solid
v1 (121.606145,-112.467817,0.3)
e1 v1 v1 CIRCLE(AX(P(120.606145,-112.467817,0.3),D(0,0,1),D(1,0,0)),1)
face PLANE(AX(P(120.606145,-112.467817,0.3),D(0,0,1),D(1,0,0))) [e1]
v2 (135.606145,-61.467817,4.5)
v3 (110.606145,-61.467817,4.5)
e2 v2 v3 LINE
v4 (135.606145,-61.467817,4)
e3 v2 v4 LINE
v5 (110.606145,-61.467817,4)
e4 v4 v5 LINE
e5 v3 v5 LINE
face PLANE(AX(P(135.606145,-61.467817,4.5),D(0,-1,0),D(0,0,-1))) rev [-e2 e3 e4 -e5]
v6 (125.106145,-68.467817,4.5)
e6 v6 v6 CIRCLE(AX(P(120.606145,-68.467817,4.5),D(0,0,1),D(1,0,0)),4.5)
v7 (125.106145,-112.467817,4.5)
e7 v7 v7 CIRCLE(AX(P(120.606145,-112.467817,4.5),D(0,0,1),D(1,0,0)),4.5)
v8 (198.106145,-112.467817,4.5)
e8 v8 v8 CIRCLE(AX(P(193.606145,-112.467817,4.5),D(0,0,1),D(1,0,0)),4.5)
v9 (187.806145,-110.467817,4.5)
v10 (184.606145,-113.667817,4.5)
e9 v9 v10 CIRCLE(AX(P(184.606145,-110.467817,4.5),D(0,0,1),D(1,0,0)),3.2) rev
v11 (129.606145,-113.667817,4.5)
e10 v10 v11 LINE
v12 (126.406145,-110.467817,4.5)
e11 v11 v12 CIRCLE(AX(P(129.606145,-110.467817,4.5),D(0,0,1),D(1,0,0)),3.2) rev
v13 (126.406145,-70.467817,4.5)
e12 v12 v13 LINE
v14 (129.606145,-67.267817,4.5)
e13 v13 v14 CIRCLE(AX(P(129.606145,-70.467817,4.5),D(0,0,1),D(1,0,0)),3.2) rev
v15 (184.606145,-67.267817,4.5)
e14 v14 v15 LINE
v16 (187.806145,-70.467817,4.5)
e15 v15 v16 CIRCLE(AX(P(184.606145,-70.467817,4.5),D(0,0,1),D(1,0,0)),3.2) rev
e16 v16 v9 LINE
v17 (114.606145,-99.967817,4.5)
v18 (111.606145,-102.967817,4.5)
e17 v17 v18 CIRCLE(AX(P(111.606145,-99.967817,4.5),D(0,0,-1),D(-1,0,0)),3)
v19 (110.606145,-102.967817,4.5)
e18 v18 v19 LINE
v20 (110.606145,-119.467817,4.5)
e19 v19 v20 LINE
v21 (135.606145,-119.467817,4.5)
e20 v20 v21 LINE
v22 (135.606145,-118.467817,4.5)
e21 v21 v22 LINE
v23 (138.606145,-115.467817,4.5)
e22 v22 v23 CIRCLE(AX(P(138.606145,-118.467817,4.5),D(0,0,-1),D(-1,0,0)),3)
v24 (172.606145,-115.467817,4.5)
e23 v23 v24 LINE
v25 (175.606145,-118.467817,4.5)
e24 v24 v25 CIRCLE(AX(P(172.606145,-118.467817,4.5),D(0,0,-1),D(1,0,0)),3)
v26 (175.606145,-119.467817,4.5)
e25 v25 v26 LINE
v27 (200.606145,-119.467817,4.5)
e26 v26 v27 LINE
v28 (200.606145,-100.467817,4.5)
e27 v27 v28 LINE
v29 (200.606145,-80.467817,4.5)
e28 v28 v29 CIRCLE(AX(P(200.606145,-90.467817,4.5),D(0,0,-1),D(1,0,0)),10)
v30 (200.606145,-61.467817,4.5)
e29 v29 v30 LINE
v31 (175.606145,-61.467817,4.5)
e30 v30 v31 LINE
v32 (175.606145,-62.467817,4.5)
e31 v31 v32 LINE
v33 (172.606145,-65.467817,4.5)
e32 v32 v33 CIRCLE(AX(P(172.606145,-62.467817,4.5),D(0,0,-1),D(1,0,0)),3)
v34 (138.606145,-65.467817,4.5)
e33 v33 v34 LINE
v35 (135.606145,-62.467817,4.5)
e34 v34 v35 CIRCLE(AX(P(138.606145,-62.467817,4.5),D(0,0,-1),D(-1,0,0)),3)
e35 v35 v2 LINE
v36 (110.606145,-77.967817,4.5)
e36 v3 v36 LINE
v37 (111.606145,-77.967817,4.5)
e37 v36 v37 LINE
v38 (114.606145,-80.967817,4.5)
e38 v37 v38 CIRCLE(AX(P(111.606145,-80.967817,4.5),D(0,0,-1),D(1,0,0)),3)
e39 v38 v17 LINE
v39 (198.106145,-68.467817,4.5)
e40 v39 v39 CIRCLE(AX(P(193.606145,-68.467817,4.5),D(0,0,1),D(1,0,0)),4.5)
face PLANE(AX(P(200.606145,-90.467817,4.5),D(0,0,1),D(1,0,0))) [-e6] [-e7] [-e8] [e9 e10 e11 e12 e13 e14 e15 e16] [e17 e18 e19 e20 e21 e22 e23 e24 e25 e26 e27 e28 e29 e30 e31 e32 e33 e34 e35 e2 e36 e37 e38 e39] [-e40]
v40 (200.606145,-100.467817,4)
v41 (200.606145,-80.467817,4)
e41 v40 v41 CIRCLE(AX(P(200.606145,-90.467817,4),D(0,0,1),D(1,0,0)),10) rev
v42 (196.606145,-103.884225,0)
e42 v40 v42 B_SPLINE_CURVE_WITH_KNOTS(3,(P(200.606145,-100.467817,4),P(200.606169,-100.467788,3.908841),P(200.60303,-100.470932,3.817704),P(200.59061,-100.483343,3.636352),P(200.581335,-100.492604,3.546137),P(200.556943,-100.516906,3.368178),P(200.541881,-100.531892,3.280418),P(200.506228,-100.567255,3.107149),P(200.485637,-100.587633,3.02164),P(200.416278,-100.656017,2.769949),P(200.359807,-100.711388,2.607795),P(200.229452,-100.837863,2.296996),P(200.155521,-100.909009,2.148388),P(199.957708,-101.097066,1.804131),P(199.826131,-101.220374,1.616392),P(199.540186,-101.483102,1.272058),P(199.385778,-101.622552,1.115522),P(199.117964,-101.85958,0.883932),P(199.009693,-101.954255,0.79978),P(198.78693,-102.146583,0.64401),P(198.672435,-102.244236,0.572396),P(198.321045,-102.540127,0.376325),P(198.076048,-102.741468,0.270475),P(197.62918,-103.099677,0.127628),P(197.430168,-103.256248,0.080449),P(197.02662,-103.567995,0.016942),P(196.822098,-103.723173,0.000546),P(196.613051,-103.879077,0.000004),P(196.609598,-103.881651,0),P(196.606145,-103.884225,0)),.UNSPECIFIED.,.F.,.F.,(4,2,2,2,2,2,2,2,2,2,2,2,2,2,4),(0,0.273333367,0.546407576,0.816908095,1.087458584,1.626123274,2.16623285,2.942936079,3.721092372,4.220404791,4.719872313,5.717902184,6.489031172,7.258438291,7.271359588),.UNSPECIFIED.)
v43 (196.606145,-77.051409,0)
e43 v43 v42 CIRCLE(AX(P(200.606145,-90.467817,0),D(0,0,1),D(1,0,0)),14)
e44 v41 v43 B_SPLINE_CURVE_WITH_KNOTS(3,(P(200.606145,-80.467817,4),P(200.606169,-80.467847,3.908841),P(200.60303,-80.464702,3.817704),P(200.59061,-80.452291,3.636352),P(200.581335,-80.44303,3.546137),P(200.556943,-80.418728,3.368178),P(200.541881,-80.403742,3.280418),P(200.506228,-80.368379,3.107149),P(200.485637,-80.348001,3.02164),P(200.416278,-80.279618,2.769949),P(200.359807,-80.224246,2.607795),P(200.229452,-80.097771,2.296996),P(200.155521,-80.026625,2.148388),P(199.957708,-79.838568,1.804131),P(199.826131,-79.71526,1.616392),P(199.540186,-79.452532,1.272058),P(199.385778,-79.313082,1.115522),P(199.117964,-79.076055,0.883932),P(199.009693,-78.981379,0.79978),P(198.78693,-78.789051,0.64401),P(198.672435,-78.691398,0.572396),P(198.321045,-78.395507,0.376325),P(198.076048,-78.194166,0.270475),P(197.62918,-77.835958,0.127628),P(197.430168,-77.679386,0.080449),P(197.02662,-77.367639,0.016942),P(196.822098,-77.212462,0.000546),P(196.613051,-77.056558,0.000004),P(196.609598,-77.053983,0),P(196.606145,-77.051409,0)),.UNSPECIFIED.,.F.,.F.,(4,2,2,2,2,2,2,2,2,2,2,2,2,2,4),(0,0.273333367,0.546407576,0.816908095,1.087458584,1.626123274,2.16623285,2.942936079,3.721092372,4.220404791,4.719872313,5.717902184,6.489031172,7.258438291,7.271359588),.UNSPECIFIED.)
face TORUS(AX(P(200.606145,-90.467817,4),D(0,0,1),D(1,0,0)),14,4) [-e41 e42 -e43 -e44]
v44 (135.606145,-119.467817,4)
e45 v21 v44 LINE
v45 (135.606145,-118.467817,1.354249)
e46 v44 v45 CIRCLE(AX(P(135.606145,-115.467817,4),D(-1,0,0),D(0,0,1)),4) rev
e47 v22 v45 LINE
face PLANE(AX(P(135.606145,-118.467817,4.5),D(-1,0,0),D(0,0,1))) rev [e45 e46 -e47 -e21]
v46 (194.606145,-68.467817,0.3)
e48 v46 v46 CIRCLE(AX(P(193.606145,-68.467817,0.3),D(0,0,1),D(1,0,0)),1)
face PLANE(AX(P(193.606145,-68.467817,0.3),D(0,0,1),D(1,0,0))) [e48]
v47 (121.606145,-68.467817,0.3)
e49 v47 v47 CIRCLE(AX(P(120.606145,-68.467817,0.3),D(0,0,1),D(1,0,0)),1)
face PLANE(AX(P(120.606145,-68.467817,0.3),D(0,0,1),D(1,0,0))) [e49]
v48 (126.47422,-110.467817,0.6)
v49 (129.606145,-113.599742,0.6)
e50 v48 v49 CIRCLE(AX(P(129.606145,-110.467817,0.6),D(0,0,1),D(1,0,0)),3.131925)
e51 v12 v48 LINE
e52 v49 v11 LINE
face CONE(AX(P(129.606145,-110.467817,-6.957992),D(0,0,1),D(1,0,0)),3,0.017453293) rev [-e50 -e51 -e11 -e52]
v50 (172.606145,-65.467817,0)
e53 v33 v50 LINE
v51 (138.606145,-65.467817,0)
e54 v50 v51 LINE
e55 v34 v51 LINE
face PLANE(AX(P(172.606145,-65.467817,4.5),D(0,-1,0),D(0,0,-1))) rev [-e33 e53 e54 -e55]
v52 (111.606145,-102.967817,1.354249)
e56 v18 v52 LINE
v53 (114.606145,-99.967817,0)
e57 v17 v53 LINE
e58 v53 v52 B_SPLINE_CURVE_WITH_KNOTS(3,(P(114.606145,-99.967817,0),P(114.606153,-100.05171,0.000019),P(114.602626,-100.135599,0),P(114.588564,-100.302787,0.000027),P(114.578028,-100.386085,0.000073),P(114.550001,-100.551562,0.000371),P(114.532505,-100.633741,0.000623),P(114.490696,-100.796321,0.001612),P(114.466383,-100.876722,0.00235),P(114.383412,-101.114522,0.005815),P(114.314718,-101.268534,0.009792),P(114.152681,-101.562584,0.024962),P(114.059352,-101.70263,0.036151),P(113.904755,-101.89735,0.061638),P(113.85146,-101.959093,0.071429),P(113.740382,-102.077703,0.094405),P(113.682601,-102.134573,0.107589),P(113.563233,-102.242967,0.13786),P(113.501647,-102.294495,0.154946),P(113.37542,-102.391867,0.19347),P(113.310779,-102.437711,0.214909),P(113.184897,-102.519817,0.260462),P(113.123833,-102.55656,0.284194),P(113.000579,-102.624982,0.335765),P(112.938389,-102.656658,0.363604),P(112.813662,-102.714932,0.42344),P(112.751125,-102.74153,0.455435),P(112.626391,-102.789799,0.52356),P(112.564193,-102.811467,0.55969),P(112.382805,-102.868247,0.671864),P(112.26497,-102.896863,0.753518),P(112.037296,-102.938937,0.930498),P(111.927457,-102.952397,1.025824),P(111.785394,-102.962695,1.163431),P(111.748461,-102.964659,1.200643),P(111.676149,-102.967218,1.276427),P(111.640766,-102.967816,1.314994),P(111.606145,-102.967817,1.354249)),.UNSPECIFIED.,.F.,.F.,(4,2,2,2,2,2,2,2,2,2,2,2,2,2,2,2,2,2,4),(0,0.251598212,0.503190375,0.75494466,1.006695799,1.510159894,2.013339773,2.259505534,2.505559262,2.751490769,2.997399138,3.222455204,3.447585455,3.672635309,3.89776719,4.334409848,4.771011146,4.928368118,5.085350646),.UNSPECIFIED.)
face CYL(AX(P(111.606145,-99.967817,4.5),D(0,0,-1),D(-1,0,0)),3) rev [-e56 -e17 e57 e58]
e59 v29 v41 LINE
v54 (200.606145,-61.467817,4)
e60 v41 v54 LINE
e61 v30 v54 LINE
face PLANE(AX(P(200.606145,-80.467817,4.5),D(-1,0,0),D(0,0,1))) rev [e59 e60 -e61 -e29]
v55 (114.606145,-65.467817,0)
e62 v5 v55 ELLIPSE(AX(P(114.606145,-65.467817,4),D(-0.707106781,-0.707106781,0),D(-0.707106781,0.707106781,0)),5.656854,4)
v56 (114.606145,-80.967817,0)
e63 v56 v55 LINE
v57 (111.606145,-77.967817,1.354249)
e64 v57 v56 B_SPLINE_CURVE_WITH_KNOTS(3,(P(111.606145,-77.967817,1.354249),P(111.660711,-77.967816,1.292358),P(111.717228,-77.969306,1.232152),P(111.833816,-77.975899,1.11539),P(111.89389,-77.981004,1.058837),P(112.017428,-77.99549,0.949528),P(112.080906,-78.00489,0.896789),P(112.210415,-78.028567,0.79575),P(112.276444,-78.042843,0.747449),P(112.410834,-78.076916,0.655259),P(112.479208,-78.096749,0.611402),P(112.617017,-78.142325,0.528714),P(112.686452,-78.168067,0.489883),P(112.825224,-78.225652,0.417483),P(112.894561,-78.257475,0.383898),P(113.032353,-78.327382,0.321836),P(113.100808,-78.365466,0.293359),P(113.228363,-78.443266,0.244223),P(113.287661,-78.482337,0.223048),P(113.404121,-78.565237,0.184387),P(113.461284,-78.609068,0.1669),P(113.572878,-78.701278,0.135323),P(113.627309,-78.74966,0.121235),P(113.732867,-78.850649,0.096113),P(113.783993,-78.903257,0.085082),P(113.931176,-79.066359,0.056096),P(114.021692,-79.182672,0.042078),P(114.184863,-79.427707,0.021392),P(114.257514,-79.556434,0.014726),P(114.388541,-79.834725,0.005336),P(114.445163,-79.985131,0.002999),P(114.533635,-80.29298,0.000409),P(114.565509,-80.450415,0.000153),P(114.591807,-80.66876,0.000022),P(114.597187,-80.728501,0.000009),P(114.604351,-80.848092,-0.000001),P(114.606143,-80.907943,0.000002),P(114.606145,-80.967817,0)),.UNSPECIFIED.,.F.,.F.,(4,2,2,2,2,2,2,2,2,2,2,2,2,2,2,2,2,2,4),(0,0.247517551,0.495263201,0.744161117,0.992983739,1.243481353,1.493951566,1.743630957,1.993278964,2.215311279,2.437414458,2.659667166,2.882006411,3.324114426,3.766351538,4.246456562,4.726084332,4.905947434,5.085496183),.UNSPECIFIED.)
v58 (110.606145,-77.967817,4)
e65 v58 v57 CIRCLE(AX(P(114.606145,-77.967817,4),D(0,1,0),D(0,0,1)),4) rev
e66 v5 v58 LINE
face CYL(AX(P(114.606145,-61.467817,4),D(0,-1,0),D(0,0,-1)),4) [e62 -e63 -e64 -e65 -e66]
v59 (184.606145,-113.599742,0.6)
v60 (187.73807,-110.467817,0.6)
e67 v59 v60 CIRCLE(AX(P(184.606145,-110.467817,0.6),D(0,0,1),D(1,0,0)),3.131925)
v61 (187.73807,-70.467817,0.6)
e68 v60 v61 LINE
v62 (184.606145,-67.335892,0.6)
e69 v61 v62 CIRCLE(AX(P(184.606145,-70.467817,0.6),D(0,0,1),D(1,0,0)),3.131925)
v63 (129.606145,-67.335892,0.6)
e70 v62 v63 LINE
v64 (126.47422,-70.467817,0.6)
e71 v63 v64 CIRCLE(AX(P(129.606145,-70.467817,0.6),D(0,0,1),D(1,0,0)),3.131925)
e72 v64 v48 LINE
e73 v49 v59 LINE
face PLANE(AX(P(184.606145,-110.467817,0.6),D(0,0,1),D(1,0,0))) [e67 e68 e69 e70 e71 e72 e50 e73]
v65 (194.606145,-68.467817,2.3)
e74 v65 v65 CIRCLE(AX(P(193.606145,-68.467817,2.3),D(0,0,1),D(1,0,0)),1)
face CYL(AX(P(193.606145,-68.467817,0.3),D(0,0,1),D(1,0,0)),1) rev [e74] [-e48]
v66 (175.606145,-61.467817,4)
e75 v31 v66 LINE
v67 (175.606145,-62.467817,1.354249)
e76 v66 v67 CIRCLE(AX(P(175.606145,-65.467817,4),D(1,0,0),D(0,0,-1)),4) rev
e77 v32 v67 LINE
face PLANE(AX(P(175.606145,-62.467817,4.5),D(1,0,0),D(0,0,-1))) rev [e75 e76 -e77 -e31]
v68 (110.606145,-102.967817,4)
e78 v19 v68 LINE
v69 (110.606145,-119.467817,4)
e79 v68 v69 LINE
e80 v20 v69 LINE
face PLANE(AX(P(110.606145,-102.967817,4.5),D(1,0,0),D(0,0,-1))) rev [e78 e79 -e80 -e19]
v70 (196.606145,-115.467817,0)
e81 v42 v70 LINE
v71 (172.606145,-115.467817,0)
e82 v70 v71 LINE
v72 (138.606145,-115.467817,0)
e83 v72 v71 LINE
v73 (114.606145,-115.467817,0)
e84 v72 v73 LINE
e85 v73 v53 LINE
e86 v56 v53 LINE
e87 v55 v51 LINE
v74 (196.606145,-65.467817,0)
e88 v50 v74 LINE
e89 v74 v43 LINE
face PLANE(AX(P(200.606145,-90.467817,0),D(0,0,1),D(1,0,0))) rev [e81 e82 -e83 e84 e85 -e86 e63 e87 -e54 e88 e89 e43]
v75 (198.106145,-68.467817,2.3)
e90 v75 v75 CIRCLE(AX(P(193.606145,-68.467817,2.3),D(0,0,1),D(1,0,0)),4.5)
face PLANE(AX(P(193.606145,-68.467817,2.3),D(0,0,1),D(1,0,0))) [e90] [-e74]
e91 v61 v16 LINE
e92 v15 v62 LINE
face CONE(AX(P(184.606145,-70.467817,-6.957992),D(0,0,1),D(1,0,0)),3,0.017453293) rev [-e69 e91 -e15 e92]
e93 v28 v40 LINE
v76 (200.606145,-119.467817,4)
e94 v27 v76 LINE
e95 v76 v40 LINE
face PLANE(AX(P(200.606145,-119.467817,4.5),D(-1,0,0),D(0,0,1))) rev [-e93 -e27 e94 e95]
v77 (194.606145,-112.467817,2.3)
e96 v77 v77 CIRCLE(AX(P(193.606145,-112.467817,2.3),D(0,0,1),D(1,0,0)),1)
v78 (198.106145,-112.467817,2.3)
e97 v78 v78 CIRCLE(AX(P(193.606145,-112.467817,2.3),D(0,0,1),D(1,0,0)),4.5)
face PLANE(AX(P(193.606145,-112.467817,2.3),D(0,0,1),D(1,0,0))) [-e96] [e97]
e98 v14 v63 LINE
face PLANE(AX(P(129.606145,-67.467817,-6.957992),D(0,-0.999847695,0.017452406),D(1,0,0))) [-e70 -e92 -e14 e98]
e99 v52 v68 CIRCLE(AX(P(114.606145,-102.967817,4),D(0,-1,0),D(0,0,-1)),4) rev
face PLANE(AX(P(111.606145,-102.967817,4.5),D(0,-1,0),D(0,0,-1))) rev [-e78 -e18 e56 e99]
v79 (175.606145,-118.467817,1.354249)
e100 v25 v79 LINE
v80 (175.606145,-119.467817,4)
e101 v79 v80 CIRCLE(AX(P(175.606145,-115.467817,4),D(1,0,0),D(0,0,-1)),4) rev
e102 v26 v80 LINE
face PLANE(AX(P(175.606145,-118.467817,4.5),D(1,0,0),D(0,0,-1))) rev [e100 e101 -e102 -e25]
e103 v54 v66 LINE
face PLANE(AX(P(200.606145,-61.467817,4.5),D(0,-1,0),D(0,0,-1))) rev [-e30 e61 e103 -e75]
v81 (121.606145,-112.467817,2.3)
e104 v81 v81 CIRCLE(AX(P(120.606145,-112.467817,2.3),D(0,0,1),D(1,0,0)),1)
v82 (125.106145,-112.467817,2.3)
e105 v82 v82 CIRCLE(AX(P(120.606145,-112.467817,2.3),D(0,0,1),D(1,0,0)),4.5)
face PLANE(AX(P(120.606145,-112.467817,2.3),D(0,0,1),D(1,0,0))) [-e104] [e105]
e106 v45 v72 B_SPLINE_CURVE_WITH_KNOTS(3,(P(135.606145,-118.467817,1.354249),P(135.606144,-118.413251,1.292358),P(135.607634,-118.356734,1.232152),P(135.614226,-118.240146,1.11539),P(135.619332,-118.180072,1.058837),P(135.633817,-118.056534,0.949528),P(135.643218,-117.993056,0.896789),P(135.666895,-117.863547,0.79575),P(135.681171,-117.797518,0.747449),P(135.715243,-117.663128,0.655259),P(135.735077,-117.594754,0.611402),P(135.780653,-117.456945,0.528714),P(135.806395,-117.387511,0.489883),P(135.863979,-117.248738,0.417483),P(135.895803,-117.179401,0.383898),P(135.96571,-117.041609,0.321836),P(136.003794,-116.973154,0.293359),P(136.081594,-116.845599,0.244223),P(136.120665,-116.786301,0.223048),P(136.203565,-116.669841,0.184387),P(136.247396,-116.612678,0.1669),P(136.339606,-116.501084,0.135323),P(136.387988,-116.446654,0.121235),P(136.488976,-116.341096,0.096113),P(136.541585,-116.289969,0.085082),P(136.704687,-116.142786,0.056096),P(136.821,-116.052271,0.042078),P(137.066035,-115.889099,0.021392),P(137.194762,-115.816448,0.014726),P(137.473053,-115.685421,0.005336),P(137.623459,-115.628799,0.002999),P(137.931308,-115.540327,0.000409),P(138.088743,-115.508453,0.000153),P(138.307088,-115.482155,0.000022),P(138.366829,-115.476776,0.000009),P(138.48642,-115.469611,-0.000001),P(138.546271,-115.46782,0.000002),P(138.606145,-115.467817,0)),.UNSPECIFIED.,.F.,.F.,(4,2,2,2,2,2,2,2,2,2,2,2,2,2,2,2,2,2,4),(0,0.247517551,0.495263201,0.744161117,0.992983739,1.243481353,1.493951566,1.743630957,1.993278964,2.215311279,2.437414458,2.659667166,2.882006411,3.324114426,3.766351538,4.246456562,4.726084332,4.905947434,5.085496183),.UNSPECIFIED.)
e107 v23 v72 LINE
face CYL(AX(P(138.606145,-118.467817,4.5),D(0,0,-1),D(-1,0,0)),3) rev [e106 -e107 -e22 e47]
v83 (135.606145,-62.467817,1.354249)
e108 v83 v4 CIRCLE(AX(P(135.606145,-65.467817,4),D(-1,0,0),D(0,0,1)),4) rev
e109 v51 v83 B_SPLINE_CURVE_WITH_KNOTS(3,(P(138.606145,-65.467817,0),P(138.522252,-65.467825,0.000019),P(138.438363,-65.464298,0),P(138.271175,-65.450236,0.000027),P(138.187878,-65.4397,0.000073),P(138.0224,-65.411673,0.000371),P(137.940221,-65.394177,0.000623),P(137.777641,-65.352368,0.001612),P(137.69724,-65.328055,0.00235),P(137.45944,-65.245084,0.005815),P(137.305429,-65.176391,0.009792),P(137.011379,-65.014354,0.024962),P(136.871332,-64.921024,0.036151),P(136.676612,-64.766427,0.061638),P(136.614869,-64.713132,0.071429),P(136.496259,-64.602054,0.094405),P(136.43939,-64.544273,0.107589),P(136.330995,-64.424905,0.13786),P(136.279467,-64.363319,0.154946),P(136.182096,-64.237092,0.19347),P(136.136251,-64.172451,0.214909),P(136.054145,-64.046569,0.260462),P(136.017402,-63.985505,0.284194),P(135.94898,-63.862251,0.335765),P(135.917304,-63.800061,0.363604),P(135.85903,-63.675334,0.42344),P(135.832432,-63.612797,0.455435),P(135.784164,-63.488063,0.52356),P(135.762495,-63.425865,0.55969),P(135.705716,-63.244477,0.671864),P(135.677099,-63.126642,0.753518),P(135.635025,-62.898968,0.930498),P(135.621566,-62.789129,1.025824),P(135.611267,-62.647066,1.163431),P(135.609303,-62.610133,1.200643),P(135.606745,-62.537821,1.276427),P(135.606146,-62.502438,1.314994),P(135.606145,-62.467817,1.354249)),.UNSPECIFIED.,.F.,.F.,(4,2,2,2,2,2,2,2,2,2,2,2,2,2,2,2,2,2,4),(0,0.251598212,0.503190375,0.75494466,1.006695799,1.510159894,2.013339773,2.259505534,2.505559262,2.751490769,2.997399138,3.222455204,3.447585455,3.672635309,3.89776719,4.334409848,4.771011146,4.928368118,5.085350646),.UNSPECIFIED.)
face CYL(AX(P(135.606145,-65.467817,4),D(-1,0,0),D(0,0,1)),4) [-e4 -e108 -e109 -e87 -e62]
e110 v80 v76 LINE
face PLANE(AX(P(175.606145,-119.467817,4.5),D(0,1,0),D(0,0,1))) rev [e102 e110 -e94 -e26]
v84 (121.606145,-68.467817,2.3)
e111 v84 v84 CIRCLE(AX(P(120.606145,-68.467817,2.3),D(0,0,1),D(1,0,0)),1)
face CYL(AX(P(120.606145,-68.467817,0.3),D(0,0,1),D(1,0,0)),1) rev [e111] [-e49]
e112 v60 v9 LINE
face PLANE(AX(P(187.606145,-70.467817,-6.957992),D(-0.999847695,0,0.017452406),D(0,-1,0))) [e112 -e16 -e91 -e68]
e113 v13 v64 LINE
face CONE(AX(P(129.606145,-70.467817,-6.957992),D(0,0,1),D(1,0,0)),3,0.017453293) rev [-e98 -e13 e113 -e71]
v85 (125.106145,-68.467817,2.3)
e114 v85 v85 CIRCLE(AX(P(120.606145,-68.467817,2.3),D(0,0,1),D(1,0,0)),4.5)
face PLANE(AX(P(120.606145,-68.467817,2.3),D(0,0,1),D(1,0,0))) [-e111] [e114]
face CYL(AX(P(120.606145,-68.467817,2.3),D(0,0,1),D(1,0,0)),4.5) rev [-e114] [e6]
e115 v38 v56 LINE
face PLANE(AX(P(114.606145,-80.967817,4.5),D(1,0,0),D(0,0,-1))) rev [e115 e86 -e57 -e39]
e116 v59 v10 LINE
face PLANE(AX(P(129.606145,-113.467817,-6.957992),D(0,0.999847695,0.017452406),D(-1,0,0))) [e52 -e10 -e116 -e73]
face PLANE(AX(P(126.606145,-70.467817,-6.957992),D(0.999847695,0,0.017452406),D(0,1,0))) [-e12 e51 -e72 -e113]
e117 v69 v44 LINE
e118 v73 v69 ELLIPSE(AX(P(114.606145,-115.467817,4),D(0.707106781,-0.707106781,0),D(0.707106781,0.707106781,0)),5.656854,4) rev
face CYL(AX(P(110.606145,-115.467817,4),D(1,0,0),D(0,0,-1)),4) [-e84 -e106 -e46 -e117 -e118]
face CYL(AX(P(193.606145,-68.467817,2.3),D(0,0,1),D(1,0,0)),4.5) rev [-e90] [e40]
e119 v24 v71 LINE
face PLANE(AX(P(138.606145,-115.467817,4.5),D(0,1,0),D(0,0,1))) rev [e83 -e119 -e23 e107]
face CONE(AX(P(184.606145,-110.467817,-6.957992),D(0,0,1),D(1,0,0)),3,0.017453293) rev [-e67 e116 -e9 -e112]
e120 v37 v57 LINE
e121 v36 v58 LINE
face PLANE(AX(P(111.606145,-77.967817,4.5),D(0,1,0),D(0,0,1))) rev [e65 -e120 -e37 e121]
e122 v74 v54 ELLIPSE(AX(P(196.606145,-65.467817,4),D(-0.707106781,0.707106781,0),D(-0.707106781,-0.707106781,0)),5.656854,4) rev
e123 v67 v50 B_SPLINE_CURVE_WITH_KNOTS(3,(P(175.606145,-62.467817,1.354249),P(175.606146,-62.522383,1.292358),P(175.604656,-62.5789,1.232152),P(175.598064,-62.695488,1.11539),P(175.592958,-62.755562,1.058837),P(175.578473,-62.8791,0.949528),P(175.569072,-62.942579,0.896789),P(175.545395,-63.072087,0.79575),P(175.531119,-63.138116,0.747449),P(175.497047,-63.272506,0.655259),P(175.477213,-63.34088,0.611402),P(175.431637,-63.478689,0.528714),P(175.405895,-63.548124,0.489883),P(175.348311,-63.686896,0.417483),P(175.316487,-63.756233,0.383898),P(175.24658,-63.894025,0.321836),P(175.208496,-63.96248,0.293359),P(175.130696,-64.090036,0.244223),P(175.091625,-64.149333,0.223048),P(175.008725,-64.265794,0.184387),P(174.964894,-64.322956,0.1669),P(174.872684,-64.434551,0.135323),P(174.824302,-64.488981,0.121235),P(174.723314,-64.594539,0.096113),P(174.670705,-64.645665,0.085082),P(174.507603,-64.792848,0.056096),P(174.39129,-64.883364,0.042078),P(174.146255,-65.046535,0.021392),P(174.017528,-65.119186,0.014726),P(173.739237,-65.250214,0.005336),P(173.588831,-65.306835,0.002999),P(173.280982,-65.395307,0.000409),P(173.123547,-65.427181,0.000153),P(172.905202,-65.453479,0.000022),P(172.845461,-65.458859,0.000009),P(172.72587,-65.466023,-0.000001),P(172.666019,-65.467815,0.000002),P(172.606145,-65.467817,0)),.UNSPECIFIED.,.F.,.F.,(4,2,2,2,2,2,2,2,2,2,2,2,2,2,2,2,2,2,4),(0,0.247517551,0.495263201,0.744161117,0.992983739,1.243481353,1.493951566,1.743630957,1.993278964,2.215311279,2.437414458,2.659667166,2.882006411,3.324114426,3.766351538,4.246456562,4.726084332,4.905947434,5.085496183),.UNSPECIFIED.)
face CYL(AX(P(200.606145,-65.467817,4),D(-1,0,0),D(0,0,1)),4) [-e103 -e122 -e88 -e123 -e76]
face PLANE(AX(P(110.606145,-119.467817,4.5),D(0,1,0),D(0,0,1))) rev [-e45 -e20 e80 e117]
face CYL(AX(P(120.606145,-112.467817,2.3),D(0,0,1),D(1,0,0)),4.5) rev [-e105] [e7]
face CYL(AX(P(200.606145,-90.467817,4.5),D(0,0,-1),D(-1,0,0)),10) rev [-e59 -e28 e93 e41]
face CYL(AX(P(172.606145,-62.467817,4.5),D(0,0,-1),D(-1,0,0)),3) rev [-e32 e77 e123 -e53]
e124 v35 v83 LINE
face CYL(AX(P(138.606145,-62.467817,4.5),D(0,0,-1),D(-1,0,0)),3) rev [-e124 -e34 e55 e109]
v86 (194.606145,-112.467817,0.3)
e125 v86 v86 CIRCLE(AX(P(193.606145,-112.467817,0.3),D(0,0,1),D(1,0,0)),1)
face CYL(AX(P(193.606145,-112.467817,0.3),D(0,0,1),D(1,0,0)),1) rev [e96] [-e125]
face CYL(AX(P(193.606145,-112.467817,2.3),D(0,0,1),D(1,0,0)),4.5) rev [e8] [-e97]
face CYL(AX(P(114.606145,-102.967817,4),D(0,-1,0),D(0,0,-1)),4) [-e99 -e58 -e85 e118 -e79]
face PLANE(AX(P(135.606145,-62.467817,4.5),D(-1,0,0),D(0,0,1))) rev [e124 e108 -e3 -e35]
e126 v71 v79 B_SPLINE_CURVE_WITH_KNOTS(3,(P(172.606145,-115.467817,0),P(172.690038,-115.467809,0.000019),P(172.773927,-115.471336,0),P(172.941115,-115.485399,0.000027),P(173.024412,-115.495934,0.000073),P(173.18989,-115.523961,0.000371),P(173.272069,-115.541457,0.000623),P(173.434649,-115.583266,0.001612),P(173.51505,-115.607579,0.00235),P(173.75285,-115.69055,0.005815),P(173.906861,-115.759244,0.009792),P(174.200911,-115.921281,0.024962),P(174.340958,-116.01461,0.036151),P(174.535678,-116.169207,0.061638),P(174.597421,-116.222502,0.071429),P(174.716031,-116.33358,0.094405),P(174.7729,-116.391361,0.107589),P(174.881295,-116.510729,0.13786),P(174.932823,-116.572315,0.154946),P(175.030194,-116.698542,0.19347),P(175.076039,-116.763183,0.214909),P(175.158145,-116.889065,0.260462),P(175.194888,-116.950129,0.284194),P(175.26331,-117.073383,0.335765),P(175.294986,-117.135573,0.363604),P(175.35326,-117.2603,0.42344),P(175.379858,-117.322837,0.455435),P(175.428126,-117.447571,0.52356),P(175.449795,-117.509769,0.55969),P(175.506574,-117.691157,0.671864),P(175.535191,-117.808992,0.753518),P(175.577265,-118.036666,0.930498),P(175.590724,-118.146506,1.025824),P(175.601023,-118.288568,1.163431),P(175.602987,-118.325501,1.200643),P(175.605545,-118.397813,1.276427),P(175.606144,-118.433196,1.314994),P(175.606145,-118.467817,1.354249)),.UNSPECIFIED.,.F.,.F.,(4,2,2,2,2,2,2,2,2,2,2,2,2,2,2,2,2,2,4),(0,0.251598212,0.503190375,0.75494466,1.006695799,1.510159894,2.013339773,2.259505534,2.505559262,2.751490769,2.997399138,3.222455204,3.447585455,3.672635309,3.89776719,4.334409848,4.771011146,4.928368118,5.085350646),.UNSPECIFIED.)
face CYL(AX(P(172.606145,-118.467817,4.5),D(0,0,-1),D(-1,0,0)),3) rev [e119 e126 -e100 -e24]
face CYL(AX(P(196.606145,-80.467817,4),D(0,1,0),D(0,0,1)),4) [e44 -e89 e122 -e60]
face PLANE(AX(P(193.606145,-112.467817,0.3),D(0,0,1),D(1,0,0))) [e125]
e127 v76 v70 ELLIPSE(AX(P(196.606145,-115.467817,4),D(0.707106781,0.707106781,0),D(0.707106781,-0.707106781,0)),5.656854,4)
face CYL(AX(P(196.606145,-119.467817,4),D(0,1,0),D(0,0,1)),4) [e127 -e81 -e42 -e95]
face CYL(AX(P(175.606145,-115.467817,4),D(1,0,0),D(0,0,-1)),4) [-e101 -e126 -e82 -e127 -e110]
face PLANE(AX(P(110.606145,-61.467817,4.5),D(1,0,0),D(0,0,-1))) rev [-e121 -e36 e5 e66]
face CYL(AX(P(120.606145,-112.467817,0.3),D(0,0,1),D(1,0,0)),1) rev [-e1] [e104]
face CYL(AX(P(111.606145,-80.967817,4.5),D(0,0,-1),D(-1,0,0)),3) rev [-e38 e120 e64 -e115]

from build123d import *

# Parameters (mm, degrees)
Y_KSEKLIK_EKSTR_ZYON1_DEPTH = 4.5
KES_EKSTR_ZYON2_DEPTH       = 3.9
IZIM7_R                     = 4.5
KES_EKSTR_ZYON3_DEPTH       = 2.2
IZIM9_R                     = 1
KES_EKSTR_ZYON4_DEPTH       = 2
RADYUS4_R                   = 4
PAH1_SIZE                   = 0.2
PAH1_SIZE_2                 = 11.457992326


# Some blends are built 0.0001 mm under size
with BuildPart() as part:
    # Çizim4 → Yükseklik-Ekstrüzyon1 (new body)
    with BuildSketch(Plane.XY):
        with BuildLine():
            Line((200.606144994, -119.46781712), (200.606144994, -100.46781712))
            ThreePointArc((200.606144994, -100.46781712), (190.606144994, -90.46781712), (200.606144994, -80.46781712))
            Line((200.606144994, -80.46781712), (200.606144994, -61.46781712))
            Line((200.606144994, -61.46781712), (175.606144994, -61.46781712))
            Line((175.606144994, -61.46781712), (175.606144994, -62.46781712))
            ThreePointArc((175.606144994, -62.46781712), (174.727465338, -64.589137464), (172.606144994, -65.46781712))
            Line((172.606144994, -65.46781712), (138.606144994, -65.46781712))
            ThreePointArc((138.606144994, -65.46781712), (136.484824651, -64.589137464), (135.606144994, -62.46781712))
            Line((135.606144994, -62.46781712), (135.606144994, -61.46781712))
            Line((135.606144994, -61.46781712), (110.606144994, -61.46781712))
            Line((110.606144994, -61.46781712), (110.606144994, -77.96781712))
            Line((110.606144994, -77.96781712), (111.606144994, -77.96781712))
            ThreePointArc((111.606144994, -77.96781712), (113.727465338, -78.846496777), (114.606144994, -80.96781712))
            Line((114.606144994, -80.96781712), (114.606144994, -99.96781712))
            ThreePointArc((114.606144994, -99.96781712), (113.727465338, -102.089137464), (111.606144994, -102.96781712))
            Line((111.606144994, -102.96781712), (110.606144994, -102.96781712))
            Line((110.606144994, -102.96781712), (110.606144994, -119.46781712))
            Line((110.606144994, -119.46781712), (135.606144994, -119.46781712))
            Line((135.606144994, -119.46781712), (135.606144994, -118.46781712))
            ThreePointArc((135.606144994, -118.46781712), (136.484824651, -116.346496777), (138.606144994, -115.46781712))
            Line((138.606144994, -115.46781712), (172.606144994, -115.46781712))
            ThreePointArc((172.606144994, -115.46781712), (174.727465338, -116.346496777), (175.606144994, -118.46781712))
            Line((175.606144994, -118.46781712), (175.606144994, -119.46781712))
            Line((175.606144994, -119.46781712), (200.606144994, -119.46781712))
        make_face()
    extrude(amount=Y_KSEKLIK_EKSTR_ZYON1_DEPTH)

    # Çizim6 → Kes-Ekstrüzyon2 (cut)
    with BuildSketch(Plane.XY.offset(4.5)):
        with BuildLine():
            Line((129.606144994, -67.46781712), (184.606144994, -67.46781712))
            ThreePointArc((184.606144994, -67.46781712), (186.727465338, -68.346496777), (187.606144994, -70.46781712))
            Line((187.606144994, -70.46781712), (187.606144994, -110.46781712))
            ThreePointArc((187.606144994, -110.46781712), (186.727465338, -112.589137464), (184.606144994, -113.46781712))
            Line((184.606144994, -113.46781712), (129.606144994, -113.46781712))
            ThreePointArc((129.606144994, -113.46781712), (127.484824651, -112.589137464), (126.606144994, -110.46781712))
            Line((126.606144994, -110.46781712), (126.606144994, -70.46781712))
            ThreePointArc((126.606144994, -70.46781712), (127.484824651, -68.346496777), (129.606144994, -67.46781712))
        make_face()
    extrude(amount=-KES_EKSTR_ZYON2_DEPTH, mode=Mode.SUBTRACT)

    # Çizim7 → Kes-Ekstrüzyon3 (cut)
    with BuildSketch(Plane.XY.offset(4.5)):
        with Locations((193.606144994, -68.46781712)):
            Circle(IZIM7_R)
        with Locations((193.606144994, -112.46781712)):
            Circle(IZIM7_R)
        with Locations((120.606144994, -68.46781712)):
            Circle(IZIM7_R)
        with Locations((120.606144994, -112.46781712)):
            Circle(IZIM7_R)
    extrude(amount=-KES_EKSTR_ZYON3_DEPTH, mode=Mode.SUBTRACT)

    # Çizim9 → Kes-Ekstrüzyon4 (cut)
    with BuildSketch(Plane.XY.offset(2.3)):
        with Locations((193.606144994, -68.46781712)):
            Circle(IZIM9_R)
        with Locations((193.606144994, -112.46781712)):
            Circle(IZIM9_R)
        with Locations((120.606144994, -68.46781712)):
            Circle(IZIM9_R)
        with Locations((120.606144994, -112.46781712)):
            Circle(IZIM9_R)
    extrude(amount=-KES_EKSTR_ZYON4_DEPTH, mode=Mode.SUBTRACT)

    # Radyus4
    radyus4_edges = [part.edges().sort_by_distance(p)[0] for p in [
        (123.106144994, -61.46781712, 0),
        (110.606144994, -111.21781712, 0),
        (123.106144994, -119.46781712, 0),
        (188.106144994, -119.46781712, 0),
        (188.106144994, -61.46781712, 0),
        (110.606144994, -69.71781712, 0),
        (200.606144994, -70.96781712, 0),
        (190.606144994, -90.46781712, 0),
        (200.606144994, -109.96781712, 0),
    ]]
    fillet(radyus4_edges, radius=RADYUS4_R - 0.0001)  # a hair under: the kernel refuses the full size

    # Pah1
    # the kernel refuses this chamfer: 11.457992326, 0.2 mm, written as the material it takes off along each edge
    with BuildSketch(Plane(origin=(184.606144994, -70.46781712, 4.5), x_dir=(0, 1, 0), z_dir=(-1, 0, 0))) as pah1_piece_1_section:
        Polygon((3 + PAH1_SIZE, 0), (3, PAH1_SIZE_2), (3, 0), align=None)
    pah1_piece_1 = revolve(axis=Axis((184.606144994, -70.46781712, 4.5), (0, 0, -1)), revolution_arc=90, mode=Mode.PRIVATE)
    pah1_piece_1 = split(pah1_piece_1, bisect_by=Plane(origin=(184.990398639, -67.399868147, 0.6), z_dir=(0, 0, 1)), keep=Keep.TOP, mode=Mode.PRIVATE)
    add(pah1_piece_1, mode=Mode.SUBTRACT)
    with BuildSketch(Plane(origin=(187.606144994, -70.46781712, 4.5), x_dir=(0.41331439412646753, 0, 0.9105883875867686), z_dir=(0, -1, 0))) as pah1_piece_2_section:
        Polygon((PAH1_SIZE * 0.413314394126, -PAH1_SIZE * 0.910588387587), (-PAH1_SIZE_2 * 0.910588387599, -PAH1_SIZE_2 * 0.413314394132), (0, 0), align=None)
    pah1_piece_2 = extrude(amount=40, mode=Mode.PRIVATE)
    pah1_piece_2 = split(pah1_piece_2, bisect_by=Plane(origin=(187.689115858, -74.555184991, 0.6), z_dir=(0, 0, 1)), keep=Keep.TOP, mode=Mode.PRIVATE)
    add(pah1_piece_2, mode=Mode.SUBTRACT)
    with BuildSketch(Plane(origin=(184.606144994, -110.46781712, 4.5), x_dir=(1, 0, 0), z_dir=(0, 1, 0))) as pah1_piece_3_section:
        Polygon((3 + PAH1_SIZE, 0), (3, PAH1_SIZE_2), (3, 0), align=None)
    pah1_piece_3 = revolve(axis=Axis((184.606144994, -110.46781712, 4.5), (0, 0, -1)), revolution_arc=90, mode=Mode.PRIVATE)
    pah1_piece_3 = split(pah1_piece_3, bisect_by=Plane(origin=(187.674093967, -110.852070765, 0.6), z_dir=(0, 0, 1)), keep=Keep.TOP, mode=Mode.PRIVATE)
    add(pah1_piece_3, mode=Mode.SUBTRACT)
    with BuildSketch(Plane(origin=(184.606144994, -113.46781712, 4.5), x_dir=(0, -0.41331439412651433, 0.9105883875867473), z_dir=(-1, 0, 0))) as pah1_piece_4_section:
        Polygon((PAH1_SIZE * 0.413314394127, -PAH1_SIZE * 0.910588387587), (-PAH1_SIZE_2 * 0.910588387599, -PAH1_SIZE_2 * 0.413314394132), (0, 0), align=None)
    pah1_piece_4 = extrude(amount=55, mode=Mode.PRIVATE)
    pah1_piece_4 = split(pah1_piece_4, bisect_by=Plane(origin=(157.106144994, -113.55196189, 0.6), z_dir=(0, 0, 1)), keep=Keep.TOP, mode=Mode.PRIVATE)
    add(pah1_piece_4, mode=Mode.SUBTRACT)
    with BuildSketch(Plane(origin=(129.606144994, -110.46781712, 4.5), x_dir=(0, -1, 0), z_dir=(1, 0, 0))) as pah1_piece_5_section:
        Polygon((3 + PAH1_SIZE, 0), (3, PAH1_SIZE_2), (3, 0), align=None)
    pah1_piece_5 = revolve(axis=Axis((129.606144994, -110.46781712, 4.5), (0, 0, -1)), revolution_arc=90, mode=Mode.PRIVATE)
    pah1_piece_5 = split(pah1_piece_5, bisect_by=Plane(origin=(129.22189135, -113.535766093, 0.6), z_dir=(0, 0, 1)), keep=Keep.TOP, mode=Mode.PRIVATE)
    add(pah1_piece_5, mode=Mode.SUBTRACT)
    with BuildSketch(Plane(origin=(126.606144994, -110.46781712, 4.5), x_dir=(-0.41331439412651433, 0, 0.9105883875867473), z_dir=(0, 1, 0))) as pah1_piece_6_section:
        Polygon((PAH1_SIZE * 0.413314394127, -PAH1_SIZE * 0.910588387587), (-PAH1_SIZE_2 * 0.910588387599, -PAH1_SIZE_2 * 0.413314394132), (0, 0), align=None)
    pah1_piece_6 = extrude(amount=40, mode=Mode.PRIVATE)
    pah1_piece_6 = split(pah1_piece_6, bisect_by=Plane(origin=(126.522000225, -90.46781712, 0.6), z_dir=(0, 0, 1)), keep=Keep.TOP, mode=Mode.PRIVATE)
    add(pah1_piece_6, mode=Mode.SUBTRACT)
    with BuildSketch(Plane(origin=(129.606144994, -70.46781712, 4.5), x_dir=(-1, 0, 0), z_dir=(0, -1, 0))) as pah1_piece_7_section:
        Polygon((3 + PAH1_SIZE, 0), (3, PAH1_SIZE_2), (3, 0), align=None)
    pah1_piece_7 = revolve(axis=Axis((129.606144994, -70.46781712, 4.5), (0, 0, -1)), revolution_arc=90, mode=Mode.PRIVATE)
    pah1_piece_7 = split(pah1_piece_7, bisect_by=Plane(origin=(126.538196021, -70.083563476, 0.6), z_dir=(0, 0, 1)), keep=Keep.TOP, mode=Mode.PRIVATE)
    add(pah1_piece_7, mode=Mode.SUBTRACT)
    with BuildSketch(Plane(origin=(129.606144994, -67.46781712, 4.5), x_dir=(0, 0.41331439412651433, 0.9105883875867473), z_dir=(1, 0, 0))) as pah1_piece_8_section:
        Polygon((PAH1_SIZE * 0.413314394127, -PAH1_SIZE * 0.910588387587), (-PAH1_SIZE_2 * 0.910588387599, -PAH1_SIZE_2 * 0.413314394132), (0, 0), align=None)
    pah1_piece_8 = extrude(amount=55, mode=Mode.PRIVATE)
    pah1_piece_8 = split(pah1_piece_8, bisect_by=Plane(origin=(157.106144994, -67.383672351, 0.6), z_dir=(0, 0, 1)), keep=Keep.TOP, mode=Mode.PRIVATE)
    add(pah1_piece_8, mode=Mode.SUBTRACT)


solid = part.part
